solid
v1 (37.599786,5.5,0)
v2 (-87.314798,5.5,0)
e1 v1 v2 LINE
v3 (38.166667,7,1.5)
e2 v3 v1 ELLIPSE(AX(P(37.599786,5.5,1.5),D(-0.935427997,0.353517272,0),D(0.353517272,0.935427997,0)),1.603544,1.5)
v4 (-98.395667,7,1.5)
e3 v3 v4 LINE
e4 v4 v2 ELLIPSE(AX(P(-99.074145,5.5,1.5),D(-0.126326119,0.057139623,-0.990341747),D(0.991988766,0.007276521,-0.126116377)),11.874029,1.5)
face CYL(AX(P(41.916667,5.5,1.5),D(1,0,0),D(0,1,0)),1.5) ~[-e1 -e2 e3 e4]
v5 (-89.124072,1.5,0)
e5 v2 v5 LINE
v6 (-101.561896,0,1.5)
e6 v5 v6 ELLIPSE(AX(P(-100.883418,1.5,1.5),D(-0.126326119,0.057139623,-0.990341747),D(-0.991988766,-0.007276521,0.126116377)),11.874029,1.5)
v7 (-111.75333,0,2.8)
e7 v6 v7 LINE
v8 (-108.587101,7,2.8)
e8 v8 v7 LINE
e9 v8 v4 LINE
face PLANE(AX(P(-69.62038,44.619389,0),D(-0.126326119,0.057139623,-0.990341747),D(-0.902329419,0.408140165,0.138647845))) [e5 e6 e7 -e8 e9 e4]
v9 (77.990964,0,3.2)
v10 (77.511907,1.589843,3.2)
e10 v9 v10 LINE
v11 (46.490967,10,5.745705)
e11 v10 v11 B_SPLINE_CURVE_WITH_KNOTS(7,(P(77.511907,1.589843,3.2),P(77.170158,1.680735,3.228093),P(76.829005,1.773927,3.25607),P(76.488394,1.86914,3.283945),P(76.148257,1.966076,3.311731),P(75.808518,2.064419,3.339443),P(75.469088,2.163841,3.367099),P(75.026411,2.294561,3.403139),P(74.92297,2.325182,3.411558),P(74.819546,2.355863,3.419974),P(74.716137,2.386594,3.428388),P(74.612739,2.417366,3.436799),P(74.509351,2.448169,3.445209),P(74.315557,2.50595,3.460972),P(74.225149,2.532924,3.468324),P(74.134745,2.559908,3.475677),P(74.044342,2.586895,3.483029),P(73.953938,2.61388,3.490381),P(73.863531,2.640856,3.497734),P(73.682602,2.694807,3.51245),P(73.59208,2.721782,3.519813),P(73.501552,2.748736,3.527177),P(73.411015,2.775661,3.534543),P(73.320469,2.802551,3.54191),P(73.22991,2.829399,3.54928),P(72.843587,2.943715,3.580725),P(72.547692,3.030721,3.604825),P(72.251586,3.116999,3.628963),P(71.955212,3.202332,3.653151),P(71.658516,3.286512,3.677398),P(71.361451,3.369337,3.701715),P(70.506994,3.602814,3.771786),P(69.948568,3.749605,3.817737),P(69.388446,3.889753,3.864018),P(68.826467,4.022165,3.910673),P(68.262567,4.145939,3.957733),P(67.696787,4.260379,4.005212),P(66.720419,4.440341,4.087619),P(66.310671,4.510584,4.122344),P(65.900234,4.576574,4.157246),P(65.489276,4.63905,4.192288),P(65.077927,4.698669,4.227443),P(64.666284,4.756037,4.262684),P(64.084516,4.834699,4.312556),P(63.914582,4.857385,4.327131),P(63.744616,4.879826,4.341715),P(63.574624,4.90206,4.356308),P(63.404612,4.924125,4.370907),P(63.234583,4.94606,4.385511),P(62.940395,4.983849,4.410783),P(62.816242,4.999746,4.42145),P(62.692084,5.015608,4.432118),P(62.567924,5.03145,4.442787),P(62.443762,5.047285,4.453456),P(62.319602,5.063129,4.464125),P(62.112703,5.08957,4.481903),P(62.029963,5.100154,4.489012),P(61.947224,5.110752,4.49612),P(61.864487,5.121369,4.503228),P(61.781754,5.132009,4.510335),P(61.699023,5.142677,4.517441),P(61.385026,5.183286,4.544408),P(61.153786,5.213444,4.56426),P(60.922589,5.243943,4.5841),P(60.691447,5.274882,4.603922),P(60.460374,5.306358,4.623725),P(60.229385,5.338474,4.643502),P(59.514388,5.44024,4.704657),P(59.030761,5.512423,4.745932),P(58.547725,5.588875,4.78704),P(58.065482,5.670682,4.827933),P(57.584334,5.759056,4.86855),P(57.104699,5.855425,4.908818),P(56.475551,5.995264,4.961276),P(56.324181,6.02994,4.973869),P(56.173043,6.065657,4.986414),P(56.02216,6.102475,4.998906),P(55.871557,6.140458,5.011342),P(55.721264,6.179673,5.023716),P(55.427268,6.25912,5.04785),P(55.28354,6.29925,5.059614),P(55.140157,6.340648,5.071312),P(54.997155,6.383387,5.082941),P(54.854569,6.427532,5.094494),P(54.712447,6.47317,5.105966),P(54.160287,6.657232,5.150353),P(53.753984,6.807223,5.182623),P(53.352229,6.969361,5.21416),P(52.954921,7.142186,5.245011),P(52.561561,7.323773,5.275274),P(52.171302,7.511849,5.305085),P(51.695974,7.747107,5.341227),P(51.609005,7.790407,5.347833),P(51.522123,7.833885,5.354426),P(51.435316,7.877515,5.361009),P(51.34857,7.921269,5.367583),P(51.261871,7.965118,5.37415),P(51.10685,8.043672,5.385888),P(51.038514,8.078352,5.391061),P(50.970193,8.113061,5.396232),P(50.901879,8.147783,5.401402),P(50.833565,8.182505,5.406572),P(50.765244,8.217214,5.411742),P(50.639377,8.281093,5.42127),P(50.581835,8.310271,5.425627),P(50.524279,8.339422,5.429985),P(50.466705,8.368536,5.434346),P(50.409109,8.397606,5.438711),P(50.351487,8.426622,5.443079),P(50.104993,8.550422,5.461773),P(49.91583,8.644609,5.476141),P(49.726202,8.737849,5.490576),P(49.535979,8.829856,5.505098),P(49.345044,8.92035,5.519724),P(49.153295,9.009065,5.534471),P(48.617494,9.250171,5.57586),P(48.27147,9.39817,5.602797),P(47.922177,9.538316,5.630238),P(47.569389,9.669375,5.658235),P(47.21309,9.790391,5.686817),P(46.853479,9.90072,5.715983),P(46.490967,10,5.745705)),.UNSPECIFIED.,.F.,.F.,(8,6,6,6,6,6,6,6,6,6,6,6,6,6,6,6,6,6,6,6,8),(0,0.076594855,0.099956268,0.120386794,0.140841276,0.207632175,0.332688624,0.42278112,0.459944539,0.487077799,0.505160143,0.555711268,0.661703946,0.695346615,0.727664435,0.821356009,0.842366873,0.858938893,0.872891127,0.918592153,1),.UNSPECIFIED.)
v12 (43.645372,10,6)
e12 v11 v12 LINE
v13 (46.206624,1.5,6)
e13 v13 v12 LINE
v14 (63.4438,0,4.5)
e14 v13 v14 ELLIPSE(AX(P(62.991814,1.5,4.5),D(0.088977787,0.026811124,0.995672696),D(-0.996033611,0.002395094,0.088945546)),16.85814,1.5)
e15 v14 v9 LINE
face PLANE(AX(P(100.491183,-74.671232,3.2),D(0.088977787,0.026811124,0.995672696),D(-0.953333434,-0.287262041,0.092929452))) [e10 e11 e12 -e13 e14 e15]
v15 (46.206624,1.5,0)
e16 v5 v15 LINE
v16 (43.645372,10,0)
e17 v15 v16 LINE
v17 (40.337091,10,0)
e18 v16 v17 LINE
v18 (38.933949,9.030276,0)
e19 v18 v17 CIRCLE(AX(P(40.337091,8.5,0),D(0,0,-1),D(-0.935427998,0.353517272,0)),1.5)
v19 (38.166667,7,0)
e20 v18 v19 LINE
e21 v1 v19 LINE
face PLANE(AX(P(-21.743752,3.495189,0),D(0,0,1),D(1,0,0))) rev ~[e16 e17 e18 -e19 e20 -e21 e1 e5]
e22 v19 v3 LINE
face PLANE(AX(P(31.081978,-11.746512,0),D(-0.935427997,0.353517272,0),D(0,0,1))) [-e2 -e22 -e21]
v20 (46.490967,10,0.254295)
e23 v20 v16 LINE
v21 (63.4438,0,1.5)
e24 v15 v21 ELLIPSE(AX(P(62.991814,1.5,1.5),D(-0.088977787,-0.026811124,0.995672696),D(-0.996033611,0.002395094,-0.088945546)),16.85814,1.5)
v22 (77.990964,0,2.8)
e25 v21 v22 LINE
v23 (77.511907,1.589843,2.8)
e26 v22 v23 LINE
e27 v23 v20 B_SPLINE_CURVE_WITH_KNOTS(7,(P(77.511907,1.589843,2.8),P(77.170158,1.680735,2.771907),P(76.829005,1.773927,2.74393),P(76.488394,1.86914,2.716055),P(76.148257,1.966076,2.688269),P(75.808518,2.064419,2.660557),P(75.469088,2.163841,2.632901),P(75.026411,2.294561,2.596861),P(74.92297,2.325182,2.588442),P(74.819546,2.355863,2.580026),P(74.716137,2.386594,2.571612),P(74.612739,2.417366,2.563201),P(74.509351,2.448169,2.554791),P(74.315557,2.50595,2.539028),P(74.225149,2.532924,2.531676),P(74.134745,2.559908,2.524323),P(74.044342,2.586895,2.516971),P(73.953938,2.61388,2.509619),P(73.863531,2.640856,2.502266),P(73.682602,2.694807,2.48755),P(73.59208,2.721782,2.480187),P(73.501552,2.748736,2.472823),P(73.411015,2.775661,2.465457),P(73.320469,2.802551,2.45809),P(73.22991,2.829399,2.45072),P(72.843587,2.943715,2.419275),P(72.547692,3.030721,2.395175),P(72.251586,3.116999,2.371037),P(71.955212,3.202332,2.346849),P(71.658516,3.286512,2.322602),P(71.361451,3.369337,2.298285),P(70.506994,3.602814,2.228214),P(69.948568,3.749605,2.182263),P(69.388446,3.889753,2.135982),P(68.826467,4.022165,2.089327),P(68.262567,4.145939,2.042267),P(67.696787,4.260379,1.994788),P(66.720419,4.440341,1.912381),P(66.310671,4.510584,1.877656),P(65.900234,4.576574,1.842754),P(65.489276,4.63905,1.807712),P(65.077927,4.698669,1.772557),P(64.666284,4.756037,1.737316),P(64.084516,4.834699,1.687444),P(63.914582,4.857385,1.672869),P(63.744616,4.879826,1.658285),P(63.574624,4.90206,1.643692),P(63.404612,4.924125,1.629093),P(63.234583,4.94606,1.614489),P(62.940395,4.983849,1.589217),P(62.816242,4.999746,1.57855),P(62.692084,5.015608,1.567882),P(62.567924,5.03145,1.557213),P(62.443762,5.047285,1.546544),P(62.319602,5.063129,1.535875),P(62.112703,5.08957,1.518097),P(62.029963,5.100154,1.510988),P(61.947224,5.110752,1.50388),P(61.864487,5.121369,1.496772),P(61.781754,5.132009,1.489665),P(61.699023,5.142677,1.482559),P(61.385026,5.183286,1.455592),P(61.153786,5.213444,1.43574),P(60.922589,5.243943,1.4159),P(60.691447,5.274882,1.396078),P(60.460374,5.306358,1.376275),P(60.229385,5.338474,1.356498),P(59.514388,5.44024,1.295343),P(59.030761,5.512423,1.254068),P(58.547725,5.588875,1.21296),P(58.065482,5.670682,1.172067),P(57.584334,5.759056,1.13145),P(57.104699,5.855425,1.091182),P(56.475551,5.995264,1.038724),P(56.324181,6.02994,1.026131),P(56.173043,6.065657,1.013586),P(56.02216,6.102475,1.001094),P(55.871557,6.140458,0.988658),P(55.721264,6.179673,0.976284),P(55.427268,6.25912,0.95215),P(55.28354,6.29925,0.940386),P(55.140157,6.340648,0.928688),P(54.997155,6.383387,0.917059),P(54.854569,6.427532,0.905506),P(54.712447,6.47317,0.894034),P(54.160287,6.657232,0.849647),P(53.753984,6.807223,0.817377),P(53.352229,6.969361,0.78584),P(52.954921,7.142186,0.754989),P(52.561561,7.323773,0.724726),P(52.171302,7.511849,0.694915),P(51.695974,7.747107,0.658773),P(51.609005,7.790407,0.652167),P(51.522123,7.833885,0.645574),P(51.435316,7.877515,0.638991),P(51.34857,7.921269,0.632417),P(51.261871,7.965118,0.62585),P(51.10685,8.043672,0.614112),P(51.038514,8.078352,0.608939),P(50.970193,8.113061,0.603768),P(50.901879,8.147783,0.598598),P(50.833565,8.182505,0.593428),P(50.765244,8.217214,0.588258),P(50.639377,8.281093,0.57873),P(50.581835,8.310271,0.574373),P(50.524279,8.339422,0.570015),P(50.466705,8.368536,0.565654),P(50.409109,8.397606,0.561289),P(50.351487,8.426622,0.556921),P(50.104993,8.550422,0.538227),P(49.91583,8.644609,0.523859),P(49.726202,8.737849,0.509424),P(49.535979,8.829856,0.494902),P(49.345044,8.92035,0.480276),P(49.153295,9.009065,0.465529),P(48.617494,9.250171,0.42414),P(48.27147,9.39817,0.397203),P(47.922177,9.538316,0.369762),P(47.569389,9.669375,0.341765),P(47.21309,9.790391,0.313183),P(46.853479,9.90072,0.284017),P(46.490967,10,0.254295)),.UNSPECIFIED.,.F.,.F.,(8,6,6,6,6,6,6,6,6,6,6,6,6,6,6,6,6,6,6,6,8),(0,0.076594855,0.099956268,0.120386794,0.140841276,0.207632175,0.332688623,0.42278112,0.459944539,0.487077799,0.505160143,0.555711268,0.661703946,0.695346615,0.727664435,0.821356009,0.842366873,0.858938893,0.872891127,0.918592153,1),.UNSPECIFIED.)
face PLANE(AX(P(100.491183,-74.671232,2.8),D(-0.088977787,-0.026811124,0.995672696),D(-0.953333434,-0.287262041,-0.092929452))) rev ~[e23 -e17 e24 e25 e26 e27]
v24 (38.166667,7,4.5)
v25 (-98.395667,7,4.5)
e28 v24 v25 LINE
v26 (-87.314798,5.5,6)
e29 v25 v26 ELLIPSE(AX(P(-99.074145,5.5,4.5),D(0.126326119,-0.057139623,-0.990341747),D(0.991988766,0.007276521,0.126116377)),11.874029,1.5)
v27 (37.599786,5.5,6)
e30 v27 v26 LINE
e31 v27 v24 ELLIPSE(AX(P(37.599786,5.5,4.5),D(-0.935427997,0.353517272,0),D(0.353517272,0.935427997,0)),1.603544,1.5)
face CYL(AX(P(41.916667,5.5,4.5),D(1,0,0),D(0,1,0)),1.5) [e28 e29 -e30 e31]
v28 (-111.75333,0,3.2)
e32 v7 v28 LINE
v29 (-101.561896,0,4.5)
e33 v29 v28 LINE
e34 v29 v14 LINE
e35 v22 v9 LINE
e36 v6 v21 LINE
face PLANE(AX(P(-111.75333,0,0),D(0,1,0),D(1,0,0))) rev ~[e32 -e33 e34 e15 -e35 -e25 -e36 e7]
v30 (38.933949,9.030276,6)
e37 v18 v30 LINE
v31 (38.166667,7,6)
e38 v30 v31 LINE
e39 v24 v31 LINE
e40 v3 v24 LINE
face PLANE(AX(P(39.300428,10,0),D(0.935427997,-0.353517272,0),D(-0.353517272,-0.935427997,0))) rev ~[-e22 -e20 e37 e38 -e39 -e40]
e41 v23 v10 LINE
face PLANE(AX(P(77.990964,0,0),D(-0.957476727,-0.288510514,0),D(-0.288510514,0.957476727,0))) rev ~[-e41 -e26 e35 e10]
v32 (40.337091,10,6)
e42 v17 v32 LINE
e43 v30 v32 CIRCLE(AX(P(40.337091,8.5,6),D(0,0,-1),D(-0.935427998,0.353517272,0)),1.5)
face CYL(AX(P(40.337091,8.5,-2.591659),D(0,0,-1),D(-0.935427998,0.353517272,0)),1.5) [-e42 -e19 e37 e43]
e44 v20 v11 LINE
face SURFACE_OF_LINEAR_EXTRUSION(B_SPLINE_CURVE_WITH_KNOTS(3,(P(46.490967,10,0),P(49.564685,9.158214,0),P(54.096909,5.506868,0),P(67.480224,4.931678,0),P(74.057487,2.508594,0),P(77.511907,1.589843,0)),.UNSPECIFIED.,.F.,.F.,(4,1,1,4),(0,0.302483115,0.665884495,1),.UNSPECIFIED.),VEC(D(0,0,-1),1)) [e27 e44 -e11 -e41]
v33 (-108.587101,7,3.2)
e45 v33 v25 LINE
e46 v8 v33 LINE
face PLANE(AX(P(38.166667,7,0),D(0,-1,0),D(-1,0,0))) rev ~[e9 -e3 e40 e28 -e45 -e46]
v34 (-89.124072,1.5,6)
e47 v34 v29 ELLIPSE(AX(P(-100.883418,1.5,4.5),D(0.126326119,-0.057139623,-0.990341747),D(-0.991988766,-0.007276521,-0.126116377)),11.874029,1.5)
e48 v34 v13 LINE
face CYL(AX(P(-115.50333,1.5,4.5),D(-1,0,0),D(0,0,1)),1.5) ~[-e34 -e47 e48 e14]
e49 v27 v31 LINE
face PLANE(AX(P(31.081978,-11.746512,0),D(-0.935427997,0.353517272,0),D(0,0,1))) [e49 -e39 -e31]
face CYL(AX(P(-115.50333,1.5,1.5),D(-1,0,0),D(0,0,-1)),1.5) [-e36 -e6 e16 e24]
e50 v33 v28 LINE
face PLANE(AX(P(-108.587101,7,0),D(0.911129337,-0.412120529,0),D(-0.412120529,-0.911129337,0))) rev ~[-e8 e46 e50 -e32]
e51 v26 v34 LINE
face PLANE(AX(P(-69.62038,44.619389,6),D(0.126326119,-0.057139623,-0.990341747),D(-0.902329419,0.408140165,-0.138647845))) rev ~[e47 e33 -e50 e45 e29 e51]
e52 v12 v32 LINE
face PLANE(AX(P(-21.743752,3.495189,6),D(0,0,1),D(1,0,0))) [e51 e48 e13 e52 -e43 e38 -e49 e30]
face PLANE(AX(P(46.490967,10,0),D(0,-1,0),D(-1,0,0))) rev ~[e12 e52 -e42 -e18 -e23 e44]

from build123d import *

# Parameters (mm, degrees)
F1_DEPTH     = 6
F2_T1_DEPTH  = 157.6354832979
F3_T1_DEPTH  = 180.911939444
F3_T3_DEPTH  = 11.1833176621
F3_T8_DEPTH  = 154.2537676368
F3_T13_DEPTH = 154.2537676368
F4_T1_DEPTH  = 108.3530023153


# Not quite as in the source:
# - a fillet or chamfer that OpenCascade refuses, or shapes differently, is made with other operations: its cross-section is extruded or revolved along the edge and cut away or added


with BuildPart() as f1:
    # F0 (on Top) → F1 (new body)
    with BuildSketch(Plane.XY):
        Polygon((38.1666665349, 7), (-81.8333334651, 7), (-81.8333334651, 0), (38.5162681341, 0), align=None)
        with BuildLine():
            Line((39.3004275709, 10), (38.1666665349, 7))
            Line((38.1666665349, 7), (38.5162681341, 0))
            Line((38.5162681341, 0), (46.4909672737, 0))
            Line((46.4909672737, 0), (77.9909640551, 0))
            Line((77.9909640551, 0), (77.5119066238, 1.5898427228))
            add(Edge.make_bspline(
                [(46.4909672737, 10), (49.5646846807, 9.1582136368), (54.0969093449, 5.5068681922), (67.4802237728, 4.9316783562), (74.0574866156, 2.5085939236), (77.5119066238, 1.5898427228)],
                knots=[0, 0, 0, 0, 0.3024831153, 0.6658844955, 1, 1, 1, 1], degree=3))
            Line((46.4909672737, 10), (39.3004275709, 10))
        make_face()
        Polygon((-81.8333334651, 0), (-81.8333334651, 7), (-108.5871011019, 7), (-111.7533296347, 0), align=None)
    extrude(amount=F1_DEPTH)

    # F2: chamfer of 30 x 2.8 on 2 edges, made by hand

    # F2_s2 → F2_t1 (cut)
    with BuildSketch(Plane(origin=(28.992055027, -96.2156198783, 0), x_dir=(0, 0, 1), z_dir=(-0.2885105142, 0.9574767272, 0))):
        Polygon((3.2, 74.6745330178), (6, 44.6745330178), (6, 74.6745330178), align=None)
        Polygon((2.8, 74.6745330178), (0, 44.6745330178), (0, 74.6745330178), align=None)
    extrude(amount=F2_T1_DEPTH, mode=Mode.SUBTRACT)

    # F3: fillet of radius 1.5 on 5 edges, made by hand

    # F3_s2 → F3_t1 (cut)
    with BuildSketch(Plane.YZ.offset(-115.5033296347)):
        with BuildLine():
            ThreePointArc((1.5, 6), (0.4393398282, 5.5606601718), (0, 4.5))
            Line((0, 4.5), (0, 6))
            Line((0, 6), (1.5, 6))
        make_face()
        with BuildLine():
            ThreePointArc((1.5, 0), (0.4393398282, 0.4393398282), (0, 1.5))
            Line((0, 1.5), (0, 0))
            Line((0, 0), (1.5, 0))
        make_face()
    extrude(amount=F3_T1_DEPTH, mode=Mode.SUBTRACT)

    # F3_s4 → F3_t3 (cut)
    with BuildSketch(Plane.XY.offset(-2.591658831)):
        with BuildLine():
            ThreePointArc((38.9339491071, 9.0302759078), (39.4842763115, 9.7339801177), (40.3370911034, 10))
            Line((40.3370911034, 10), (39.3004275709, 10))
            Line((39.3004275709, 10), (38.9339491071, 9.0302759078))
        make_face()
    extrude(amount=F3_T3_DEPTH, mode=Mode.SUBTRACT)


with BuildPart() as f3_tool6:
    # F3_s7 → F3_t8 (new body)
    with BuildSketch(Plane.YZ.offset(41.9166665349)):
        with BuildLine():
            ThreePointArc((7, 4.5), (6.5606601718, 5.5606601718), (5.5, 6))
            Line((5.5, 6), (7, 6))
            Line((7, 6), (7, 4.5))
        make_face()
    extrude(amount=-F3_T8_DEPTH)

    split(bisect_by=Plane(origin=(31.0819782613, -11.7465119587, 0), x_dir=(0, 0, 1), z_dir=(-0.9354279975, 0.3535172719, 0)), keep=Keep.TOP)


with BuildPart() as f1_1:
    add(f1.part)

    # F3_t5: cut F3_tool6
    add(f3_tool6.part, mode=Mode.SUBTRACT)


with BuildPart() as f3_tool11:
    # F3_s12 → F3_t13 (new body)
    with BuildSketch(Plane.YZ.offset(41.9166665349)):
        with BuildLine():
            ThreePointArc((7, 1.5), (6.5606601718, 0.4393398282), (5.5, 0))
            Line((5.5, 0), (7, 0))
            Line((7, 0), (7, 1.5))
        make_face()
    extrude(amount=-F3_T13_DEPTH)

    split(bisect_by=Plane(origin=(31.0819782613, -11.7465119587, 0), x_dir=(0, 0, 1), z_dir=(-0.9354279975, 0.3535172719, 0)), keep=Keep.TOP)


with BuildPart() as f1_2:
    add(f1_1.part)

    # F3_t10: cut F3_tool11
    add(f3_tool11.part, mode=Mode.SUBTRACT)

    # F4: chamfer of 20 x 2.8 on 2 edges, made by hand

    # F4_s2 → F4_t1 (cut)
    with BuildSketch(Plane(origin=(4.9298048814, 10.8989713826, 0), x_dir=(0, 0, 1), z_dir=(-0.4121205293, -0.9111293373, 0))):
        Polygon((6, 81.8217371748), (3.2, 101.8217371748), (6, 101.8217371748), align=None)
        Polygon((0, 81.8217371748), (2.8, 101.8217371748), (0, 101.8217371748), align=None)
    extrude(amount=F4_T1_DEPTH, mode=Mode.SUBTRACT)


solid = f1_2.part
